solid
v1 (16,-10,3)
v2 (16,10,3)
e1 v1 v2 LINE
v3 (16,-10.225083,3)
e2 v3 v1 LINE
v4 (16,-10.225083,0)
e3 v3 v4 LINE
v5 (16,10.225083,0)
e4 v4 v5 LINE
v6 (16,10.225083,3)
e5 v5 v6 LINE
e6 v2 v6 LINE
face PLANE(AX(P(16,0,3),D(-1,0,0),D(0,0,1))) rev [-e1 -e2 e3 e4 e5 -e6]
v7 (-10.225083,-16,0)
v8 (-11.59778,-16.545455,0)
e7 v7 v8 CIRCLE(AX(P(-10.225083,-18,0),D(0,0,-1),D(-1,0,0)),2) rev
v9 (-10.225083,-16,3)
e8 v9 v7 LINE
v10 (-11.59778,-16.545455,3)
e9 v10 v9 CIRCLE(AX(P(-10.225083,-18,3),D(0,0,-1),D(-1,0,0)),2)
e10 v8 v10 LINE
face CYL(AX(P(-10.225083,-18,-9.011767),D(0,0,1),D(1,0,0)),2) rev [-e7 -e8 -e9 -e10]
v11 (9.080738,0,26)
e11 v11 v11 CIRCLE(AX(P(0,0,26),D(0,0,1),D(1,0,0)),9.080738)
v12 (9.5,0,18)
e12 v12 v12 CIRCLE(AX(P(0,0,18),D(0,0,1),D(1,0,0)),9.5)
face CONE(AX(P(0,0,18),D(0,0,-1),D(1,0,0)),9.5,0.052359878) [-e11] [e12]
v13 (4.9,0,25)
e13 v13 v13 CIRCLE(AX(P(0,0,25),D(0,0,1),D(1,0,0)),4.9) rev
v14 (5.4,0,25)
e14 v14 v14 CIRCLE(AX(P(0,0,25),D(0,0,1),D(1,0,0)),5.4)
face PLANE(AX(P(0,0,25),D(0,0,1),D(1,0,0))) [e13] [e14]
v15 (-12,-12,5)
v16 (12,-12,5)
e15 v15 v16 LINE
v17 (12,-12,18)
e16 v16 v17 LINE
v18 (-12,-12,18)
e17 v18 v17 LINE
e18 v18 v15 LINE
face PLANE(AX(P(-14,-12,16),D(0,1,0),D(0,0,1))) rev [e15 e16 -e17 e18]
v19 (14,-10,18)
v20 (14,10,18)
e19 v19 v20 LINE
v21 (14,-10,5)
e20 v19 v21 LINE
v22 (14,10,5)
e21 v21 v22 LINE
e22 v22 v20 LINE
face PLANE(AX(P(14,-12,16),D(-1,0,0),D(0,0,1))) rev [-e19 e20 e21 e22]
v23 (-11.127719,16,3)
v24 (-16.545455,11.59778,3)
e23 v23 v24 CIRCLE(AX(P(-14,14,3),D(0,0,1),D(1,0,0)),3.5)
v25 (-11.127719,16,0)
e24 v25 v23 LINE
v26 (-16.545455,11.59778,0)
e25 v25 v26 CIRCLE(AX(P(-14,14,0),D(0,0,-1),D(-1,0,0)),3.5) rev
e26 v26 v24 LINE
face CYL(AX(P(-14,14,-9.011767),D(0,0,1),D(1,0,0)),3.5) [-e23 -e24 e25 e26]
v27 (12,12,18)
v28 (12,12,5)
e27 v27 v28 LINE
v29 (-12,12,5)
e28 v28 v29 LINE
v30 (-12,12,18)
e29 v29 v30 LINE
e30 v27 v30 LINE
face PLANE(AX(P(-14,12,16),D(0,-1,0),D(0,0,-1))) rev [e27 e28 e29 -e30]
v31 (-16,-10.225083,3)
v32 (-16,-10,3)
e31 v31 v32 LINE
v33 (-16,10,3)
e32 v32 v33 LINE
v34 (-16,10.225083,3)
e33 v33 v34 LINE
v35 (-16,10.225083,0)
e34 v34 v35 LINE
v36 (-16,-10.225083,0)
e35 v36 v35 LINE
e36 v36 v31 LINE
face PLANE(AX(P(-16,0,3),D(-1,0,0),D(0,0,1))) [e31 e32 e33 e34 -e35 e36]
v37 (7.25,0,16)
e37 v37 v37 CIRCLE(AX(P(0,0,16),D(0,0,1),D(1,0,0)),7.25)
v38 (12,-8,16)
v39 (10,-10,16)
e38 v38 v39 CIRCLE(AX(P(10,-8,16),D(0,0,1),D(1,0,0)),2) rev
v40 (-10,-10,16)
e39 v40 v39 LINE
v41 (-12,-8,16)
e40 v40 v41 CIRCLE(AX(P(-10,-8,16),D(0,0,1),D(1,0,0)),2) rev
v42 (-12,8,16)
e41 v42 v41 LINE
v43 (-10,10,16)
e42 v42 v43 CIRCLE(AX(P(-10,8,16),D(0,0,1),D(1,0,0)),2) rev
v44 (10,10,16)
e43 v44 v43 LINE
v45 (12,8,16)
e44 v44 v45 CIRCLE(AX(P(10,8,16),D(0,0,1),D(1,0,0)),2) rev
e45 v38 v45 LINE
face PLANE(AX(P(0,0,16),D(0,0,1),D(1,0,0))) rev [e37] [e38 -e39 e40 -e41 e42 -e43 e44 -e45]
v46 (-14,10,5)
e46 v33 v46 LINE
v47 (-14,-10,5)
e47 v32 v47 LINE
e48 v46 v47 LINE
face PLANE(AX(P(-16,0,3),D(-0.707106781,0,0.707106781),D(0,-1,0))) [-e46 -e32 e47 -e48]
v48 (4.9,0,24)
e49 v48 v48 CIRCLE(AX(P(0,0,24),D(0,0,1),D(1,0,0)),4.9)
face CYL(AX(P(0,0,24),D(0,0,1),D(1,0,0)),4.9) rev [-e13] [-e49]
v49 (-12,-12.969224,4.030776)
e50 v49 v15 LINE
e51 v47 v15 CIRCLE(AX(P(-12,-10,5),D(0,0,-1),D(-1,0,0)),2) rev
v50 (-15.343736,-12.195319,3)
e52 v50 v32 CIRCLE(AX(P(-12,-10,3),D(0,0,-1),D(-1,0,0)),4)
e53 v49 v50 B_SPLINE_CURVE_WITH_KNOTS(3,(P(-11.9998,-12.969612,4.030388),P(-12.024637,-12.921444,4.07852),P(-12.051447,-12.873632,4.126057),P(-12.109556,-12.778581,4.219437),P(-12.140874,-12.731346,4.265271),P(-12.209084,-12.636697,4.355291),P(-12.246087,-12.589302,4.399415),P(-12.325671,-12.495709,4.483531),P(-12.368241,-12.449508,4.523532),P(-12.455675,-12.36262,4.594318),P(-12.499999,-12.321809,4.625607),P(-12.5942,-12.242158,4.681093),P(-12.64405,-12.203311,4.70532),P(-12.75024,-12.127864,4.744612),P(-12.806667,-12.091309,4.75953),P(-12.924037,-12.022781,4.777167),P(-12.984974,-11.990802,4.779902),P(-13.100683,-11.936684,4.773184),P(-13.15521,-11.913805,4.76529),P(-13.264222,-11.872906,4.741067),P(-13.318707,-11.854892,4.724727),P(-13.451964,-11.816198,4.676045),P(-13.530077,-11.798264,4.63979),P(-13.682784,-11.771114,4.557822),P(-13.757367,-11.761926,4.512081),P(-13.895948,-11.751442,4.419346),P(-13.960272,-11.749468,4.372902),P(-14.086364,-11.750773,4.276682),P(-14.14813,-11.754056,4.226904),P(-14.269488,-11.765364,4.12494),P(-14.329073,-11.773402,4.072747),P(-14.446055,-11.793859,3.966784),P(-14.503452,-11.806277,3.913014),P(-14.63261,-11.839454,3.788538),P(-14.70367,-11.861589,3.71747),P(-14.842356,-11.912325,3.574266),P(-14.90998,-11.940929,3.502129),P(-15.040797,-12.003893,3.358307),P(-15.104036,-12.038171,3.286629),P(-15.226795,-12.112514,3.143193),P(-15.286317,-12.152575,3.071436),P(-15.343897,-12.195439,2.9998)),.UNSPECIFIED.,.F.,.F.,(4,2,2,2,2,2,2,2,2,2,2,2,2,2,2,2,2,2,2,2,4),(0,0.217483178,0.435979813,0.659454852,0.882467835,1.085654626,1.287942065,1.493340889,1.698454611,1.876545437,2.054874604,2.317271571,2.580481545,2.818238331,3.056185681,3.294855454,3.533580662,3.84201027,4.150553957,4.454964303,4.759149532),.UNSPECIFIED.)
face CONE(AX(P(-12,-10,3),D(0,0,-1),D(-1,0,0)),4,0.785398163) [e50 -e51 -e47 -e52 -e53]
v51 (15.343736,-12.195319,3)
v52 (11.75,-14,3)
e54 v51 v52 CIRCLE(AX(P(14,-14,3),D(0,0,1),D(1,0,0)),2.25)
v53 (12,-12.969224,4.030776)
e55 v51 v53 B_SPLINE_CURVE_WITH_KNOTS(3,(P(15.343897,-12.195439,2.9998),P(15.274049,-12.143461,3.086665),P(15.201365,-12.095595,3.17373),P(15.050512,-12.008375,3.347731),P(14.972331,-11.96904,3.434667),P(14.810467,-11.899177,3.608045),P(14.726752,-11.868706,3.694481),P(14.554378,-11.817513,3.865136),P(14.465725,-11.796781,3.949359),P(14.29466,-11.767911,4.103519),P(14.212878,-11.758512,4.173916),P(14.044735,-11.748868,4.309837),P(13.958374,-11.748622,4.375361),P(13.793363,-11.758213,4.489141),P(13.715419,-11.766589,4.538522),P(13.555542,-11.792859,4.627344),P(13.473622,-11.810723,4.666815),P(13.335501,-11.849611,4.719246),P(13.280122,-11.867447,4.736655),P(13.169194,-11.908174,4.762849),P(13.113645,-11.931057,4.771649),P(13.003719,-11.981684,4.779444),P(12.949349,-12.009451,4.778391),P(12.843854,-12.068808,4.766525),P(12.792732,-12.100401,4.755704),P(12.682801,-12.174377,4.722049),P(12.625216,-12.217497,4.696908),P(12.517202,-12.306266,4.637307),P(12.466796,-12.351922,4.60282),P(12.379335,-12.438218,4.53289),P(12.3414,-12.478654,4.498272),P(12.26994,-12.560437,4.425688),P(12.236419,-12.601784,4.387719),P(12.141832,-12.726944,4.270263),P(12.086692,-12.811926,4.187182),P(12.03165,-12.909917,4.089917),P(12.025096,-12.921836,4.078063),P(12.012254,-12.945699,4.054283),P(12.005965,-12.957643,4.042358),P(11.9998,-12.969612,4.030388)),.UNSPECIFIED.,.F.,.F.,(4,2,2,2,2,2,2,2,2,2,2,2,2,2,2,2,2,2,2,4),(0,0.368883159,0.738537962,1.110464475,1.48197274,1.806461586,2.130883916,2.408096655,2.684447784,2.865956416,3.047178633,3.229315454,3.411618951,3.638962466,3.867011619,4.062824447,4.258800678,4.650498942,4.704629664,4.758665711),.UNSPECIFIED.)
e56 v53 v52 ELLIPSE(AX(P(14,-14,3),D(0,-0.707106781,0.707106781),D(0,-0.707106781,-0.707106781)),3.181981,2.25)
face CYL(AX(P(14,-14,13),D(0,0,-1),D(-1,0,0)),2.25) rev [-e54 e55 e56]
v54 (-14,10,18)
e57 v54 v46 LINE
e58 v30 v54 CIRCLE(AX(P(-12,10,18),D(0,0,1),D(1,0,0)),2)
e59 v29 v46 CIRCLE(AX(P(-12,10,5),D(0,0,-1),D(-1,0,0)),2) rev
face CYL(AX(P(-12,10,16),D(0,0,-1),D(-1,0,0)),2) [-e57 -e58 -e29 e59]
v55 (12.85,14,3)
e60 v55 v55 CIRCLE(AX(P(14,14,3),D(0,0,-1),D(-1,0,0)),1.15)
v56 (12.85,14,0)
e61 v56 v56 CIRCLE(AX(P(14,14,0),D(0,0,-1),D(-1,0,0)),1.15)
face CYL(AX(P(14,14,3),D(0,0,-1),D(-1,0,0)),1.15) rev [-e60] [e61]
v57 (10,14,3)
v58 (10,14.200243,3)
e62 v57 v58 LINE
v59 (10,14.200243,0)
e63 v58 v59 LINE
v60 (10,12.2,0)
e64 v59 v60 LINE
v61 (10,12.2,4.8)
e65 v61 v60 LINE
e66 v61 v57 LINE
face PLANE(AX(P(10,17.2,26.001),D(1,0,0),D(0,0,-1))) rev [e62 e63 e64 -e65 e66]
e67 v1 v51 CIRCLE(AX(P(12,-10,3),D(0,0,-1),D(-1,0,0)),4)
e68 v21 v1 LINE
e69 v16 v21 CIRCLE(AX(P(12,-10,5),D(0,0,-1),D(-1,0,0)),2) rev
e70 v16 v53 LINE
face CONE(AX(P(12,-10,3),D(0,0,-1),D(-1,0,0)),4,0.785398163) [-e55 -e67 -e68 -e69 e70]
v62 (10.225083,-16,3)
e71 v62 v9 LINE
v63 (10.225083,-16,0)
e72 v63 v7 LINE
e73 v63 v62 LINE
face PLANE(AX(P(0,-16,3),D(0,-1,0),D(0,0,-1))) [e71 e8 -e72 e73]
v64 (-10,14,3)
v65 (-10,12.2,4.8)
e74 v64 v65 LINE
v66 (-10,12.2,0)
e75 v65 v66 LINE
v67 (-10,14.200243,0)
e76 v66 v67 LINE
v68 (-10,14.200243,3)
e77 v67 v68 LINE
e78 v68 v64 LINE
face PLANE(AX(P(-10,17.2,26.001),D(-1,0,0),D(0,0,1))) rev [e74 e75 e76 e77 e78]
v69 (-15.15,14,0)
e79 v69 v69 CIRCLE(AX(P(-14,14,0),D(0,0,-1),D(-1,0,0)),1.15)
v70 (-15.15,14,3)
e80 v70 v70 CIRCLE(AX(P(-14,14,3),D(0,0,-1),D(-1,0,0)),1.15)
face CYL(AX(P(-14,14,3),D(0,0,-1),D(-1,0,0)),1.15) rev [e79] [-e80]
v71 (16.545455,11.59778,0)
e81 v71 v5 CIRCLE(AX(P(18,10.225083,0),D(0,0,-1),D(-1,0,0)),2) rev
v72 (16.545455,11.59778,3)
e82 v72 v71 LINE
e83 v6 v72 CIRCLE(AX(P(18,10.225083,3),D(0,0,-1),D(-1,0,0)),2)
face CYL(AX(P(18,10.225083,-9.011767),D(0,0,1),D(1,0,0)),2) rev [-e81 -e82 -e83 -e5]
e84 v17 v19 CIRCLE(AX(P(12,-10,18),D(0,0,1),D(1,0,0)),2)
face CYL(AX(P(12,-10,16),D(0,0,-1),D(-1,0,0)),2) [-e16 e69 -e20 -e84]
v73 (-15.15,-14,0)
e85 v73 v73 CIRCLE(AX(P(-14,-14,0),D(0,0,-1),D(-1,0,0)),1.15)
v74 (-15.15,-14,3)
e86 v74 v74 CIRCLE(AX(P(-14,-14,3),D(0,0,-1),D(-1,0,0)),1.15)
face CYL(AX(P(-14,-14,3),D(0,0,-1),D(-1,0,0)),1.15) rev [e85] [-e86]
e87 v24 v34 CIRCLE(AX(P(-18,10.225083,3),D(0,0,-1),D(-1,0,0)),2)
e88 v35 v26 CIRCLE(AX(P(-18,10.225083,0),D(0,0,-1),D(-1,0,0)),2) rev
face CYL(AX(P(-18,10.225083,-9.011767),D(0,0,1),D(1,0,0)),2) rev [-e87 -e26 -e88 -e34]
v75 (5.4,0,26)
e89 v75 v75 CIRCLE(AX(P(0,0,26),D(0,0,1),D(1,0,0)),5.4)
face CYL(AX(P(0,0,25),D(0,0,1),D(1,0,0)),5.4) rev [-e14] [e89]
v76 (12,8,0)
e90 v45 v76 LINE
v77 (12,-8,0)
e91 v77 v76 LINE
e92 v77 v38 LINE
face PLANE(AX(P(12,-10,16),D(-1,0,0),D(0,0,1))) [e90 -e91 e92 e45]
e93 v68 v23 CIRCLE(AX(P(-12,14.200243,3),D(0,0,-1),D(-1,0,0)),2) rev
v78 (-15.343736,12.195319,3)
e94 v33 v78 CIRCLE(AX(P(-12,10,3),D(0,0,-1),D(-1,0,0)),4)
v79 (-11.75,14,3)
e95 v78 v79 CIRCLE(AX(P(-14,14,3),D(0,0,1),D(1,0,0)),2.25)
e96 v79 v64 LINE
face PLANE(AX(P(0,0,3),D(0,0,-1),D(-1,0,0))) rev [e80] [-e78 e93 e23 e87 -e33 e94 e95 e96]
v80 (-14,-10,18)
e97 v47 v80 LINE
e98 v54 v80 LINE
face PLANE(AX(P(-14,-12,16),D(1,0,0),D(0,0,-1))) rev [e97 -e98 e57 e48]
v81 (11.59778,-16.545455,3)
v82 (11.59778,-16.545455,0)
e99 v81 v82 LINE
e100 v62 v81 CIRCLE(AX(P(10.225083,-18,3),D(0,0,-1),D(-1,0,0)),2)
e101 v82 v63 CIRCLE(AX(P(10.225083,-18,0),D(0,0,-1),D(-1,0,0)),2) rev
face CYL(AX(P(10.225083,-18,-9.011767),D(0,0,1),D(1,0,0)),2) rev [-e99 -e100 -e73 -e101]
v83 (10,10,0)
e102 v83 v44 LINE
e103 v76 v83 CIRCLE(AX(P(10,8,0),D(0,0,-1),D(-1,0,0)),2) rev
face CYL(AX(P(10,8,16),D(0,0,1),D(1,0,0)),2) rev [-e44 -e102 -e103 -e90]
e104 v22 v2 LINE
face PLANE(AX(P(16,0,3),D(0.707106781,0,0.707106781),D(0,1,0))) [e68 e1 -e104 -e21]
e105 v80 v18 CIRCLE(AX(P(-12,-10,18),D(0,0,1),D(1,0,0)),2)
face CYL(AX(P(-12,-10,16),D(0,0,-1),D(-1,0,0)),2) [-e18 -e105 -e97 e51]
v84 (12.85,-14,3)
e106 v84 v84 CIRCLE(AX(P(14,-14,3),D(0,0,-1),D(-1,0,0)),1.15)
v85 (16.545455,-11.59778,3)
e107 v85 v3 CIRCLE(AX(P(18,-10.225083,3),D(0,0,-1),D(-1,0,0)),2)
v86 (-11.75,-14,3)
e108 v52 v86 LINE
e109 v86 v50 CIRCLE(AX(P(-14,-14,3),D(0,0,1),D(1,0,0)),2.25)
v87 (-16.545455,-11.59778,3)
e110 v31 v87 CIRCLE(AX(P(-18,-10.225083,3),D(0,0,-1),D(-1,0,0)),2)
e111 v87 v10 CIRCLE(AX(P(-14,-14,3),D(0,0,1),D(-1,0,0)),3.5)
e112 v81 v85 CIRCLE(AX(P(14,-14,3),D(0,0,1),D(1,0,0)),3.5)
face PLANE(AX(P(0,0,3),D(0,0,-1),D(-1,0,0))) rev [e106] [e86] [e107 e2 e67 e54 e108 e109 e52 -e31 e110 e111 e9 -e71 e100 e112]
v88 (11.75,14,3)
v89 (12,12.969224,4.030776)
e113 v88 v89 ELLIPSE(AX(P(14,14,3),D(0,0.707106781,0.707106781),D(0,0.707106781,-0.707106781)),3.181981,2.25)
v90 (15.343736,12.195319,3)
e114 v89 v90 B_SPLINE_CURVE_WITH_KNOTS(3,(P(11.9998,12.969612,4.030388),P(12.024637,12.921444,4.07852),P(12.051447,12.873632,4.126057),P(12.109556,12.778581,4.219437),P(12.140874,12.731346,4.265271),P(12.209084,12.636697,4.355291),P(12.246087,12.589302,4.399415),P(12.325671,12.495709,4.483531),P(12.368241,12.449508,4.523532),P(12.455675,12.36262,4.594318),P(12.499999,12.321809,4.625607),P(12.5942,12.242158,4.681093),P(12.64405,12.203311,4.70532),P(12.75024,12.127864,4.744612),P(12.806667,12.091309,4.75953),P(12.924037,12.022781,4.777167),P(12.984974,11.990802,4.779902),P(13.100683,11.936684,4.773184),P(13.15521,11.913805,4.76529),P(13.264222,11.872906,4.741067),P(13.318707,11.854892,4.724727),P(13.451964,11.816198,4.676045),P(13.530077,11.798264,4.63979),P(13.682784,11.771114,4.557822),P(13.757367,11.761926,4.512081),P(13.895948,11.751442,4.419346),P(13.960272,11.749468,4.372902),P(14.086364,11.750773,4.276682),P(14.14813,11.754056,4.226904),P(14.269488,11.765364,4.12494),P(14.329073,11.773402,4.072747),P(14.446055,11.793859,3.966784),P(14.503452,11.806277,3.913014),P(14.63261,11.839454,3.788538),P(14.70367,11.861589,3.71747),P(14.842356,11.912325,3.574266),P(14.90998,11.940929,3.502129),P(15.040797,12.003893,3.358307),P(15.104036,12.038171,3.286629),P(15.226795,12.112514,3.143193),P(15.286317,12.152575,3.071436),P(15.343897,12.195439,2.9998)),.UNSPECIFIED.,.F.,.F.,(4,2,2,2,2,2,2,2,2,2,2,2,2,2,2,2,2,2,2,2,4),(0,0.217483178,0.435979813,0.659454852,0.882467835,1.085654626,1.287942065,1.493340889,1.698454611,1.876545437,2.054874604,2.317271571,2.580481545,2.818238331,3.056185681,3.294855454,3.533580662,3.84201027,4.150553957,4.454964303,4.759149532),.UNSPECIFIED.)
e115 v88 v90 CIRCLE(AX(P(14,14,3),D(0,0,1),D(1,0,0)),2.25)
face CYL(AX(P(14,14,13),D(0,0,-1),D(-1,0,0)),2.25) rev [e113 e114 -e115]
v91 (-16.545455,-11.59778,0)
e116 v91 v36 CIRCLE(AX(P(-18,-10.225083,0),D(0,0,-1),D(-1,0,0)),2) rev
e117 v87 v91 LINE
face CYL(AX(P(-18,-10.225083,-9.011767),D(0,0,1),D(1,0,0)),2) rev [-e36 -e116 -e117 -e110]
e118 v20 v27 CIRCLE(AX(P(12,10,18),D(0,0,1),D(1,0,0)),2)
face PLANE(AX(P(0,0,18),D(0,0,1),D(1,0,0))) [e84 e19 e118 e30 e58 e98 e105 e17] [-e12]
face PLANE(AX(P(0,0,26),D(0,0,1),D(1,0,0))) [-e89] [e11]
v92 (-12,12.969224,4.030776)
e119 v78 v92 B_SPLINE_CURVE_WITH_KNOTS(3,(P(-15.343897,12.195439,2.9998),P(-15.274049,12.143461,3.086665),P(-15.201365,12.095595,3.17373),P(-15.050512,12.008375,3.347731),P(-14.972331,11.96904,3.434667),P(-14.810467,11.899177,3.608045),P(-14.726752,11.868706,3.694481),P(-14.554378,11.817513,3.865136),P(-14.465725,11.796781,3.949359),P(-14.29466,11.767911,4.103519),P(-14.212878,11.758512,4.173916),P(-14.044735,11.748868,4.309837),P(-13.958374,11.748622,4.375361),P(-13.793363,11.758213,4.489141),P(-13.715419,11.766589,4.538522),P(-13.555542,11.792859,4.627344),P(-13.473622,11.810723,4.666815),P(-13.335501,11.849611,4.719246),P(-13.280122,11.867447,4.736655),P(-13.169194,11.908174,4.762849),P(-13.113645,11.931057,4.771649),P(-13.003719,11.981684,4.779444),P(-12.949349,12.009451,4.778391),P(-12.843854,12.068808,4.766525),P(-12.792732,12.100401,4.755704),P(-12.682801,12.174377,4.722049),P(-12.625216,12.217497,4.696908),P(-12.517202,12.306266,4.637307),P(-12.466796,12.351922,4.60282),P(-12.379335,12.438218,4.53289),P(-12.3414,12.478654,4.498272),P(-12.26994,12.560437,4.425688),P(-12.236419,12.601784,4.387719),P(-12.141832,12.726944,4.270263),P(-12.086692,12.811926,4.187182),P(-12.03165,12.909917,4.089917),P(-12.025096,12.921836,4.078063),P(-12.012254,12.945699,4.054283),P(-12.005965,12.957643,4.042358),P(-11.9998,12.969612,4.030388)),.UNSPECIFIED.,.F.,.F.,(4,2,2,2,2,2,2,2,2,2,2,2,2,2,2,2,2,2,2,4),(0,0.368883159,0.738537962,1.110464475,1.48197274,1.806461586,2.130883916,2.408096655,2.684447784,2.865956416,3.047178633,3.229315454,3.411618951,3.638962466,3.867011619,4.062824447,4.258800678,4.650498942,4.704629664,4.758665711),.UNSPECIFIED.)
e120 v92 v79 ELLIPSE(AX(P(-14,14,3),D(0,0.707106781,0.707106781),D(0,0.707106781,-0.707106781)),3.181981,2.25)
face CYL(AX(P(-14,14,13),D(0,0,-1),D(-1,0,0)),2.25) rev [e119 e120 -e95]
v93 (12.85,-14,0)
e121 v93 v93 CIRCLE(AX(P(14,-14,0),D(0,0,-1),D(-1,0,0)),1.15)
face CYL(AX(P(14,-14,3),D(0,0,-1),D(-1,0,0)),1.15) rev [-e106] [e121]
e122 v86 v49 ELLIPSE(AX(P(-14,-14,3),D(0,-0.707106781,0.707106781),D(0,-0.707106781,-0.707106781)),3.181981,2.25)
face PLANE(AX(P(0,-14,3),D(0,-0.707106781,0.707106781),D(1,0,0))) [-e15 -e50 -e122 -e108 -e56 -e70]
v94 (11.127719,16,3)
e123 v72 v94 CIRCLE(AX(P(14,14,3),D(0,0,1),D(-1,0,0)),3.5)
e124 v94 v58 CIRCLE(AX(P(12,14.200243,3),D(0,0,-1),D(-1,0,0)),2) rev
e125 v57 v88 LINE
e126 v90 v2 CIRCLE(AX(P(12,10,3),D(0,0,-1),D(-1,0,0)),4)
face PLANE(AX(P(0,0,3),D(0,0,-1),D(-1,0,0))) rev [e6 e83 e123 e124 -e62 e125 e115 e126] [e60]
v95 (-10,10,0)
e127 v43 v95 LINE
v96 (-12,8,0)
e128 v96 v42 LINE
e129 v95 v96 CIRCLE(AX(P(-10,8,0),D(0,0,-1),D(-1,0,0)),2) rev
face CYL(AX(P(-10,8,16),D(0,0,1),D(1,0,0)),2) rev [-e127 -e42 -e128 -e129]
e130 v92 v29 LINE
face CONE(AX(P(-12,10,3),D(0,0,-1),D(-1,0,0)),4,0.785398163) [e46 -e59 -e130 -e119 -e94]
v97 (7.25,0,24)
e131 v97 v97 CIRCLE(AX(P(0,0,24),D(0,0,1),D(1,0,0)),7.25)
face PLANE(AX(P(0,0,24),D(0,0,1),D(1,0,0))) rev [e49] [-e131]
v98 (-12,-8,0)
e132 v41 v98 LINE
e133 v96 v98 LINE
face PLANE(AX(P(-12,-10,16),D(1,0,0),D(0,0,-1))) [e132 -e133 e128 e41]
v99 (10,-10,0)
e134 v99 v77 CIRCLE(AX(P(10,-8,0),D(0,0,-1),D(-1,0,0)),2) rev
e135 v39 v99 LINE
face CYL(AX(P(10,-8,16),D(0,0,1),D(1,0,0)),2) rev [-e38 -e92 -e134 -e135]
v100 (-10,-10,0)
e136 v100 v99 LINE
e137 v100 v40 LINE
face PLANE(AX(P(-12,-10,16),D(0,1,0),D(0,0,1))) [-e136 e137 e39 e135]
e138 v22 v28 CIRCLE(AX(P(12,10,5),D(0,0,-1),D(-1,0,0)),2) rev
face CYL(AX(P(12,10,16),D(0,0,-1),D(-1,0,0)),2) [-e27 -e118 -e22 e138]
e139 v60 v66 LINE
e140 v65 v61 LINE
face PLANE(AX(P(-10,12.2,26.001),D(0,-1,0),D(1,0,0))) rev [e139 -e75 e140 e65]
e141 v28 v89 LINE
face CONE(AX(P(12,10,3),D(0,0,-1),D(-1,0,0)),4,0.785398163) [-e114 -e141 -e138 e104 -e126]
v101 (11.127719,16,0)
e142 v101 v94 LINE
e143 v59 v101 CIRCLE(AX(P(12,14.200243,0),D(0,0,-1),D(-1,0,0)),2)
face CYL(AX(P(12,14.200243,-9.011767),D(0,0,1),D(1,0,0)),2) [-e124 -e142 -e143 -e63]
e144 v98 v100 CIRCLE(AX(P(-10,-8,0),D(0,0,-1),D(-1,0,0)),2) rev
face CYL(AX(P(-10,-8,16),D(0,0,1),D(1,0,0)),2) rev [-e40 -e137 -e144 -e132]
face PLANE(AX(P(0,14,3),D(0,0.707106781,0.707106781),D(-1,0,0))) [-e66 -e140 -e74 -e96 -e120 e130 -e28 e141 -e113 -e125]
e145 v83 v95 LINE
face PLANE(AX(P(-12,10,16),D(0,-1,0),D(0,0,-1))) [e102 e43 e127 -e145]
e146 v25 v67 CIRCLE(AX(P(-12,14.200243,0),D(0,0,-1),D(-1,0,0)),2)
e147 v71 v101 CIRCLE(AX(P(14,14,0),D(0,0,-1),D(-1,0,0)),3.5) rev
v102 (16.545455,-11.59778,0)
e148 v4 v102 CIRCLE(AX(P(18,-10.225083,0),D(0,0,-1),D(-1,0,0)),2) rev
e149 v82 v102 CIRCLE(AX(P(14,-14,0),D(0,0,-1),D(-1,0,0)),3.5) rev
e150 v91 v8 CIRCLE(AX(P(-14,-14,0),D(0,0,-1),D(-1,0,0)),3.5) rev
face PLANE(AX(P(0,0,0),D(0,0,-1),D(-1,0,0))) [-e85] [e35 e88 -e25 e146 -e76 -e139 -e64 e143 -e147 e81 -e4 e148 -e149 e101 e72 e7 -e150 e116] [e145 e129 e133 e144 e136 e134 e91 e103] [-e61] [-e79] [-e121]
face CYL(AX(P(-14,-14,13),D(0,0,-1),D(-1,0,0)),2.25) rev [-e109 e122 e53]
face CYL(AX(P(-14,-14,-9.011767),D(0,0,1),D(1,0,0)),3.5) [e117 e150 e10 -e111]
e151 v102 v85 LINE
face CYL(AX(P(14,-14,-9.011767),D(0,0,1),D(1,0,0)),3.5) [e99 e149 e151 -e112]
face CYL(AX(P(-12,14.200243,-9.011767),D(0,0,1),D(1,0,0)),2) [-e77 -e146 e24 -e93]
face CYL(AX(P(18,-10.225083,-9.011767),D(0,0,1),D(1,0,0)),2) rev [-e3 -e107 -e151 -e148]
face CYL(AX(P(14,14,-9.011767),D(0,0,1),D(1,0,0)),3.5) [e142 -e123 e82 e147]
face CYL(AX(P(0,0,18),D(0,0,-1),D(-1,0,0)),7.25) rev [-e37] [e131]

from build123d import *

# Parameters (mm, degrees)
SKETCH_1_W          = 28
SKETCH_1_H          = 24
SKETCH_1_W_2        = 24
SKETCH_1_H_2        = 20
EXTRUDE_1_DEPTH     = 16
SKETCH_2_W          = 32
SKETCH_2_H          = 32
SKETCH_2_R          = 1.15
SKETCH_2_W_2        = 28
SKETCH_2_H_2        = 24
EXTRUDE_2_DEPTH     = 3
SKETCH_3_W          = 28
SKETCH_3_H          = 24
SKETCH_3_R          = 7.25
EXTRUDE_3_DEPTH     = 2
SKETCH_4_R          = 9.5
EXTRUDE_4_DEPTH     = 8
EXTRUDE_4_TAPER     = 3
SKETCH_6_R          = 7.25
CUT_EXTRUDE_2_DEPTH = 29.91366459
EXTRUDE_START       = -2
SKETCH_5_R          = 7.25
SKETCH_5_R_2        = 4.9
EXTRUDE_5_DEPTH     = 2
SKETCH_9_R          = 5.4
CUT_EXTRUDE_5_DEPTH = 1
FILLET_1_R          = 2
CUT_EXTRUDE_3_REACH = 36.467
SKETCH_7_W          = 20
SKETCH_7_H          = 5
CHAMFER_1_SIZE      = 2
SKETCH_8_R          = 2.25
CUT_EXTRUDE_4_DEPTH = 10
EXTRUDE_6_DEPTH     = 3
FILLET_2_R          = 2


with BuildPart() as part:
    # 草图1 → 凸台-拉伸1 (new body)
    with BuildSketch(Plane.XY):
        Rectangle(SKETCH_1_W, SKETCH_1_H)
        Rectangle(SKETCH_1_W_2, SKETCH_1_H_2, mode=Mode.SUBTRACT)
    extrude(amount=EXTRUDE_1_DEPTH)

    # 草图2 → 凸台-拉伸2 (add)
    with BuildSketch(Plane(origin=(0, 0, 0), x_dir=(-1, 0, 0), z_dir=(0, 0, -1))):
        Rectangle(SKETCH_2_W, SKETCH_2_H)
        with Locations((14, 14)):
            Circle(SKETCH_2_R, mode=Mode.SUBTRACT)
        with Locations((14, -14)):
            Circle(SKETCH_2_R, mode=Mode.SUBTRACT)
        with Locations((-14, -14)):
            Circle(SKETCH_2_R, mode=Mode.SUBTRACT)
        with Locations((-14, 14)):
            Circle(SKETCH_2_R, mode=Mode.SUBTRACT)
        Rectangle(SKETCH_2_W_2, SKETCH_2_H_2, mode=Mode.SUBTRACT)
    extrude(amount=-EXTRUDE_2_DEPTH)

    # 草图3 → 凸台-拉伸3 (add)
    with BuildSketch(Plane.XY.offset(16)):
        Rectangle(SKETCH_3_W, SKETCH_3_H)
        Circle(SKETCH_3_R, mode=Mode.SUBTRACT)
    extrude(amount=EXTRUDE_3_DEPTH)

    # 草图4 → 凸台-拉伸4 (add)
    with BuildSketch(Plane.XY.offset(18)):
        Circle(SKETCH_4_R)
    extrude(amount=EXTRUDE_4_DEPTH, taper=EXTRUDE_4_TAPER)

    # 草图6 → 切除-拉伸2 (cut, through all)
    with BuildSketch(Plane(origin=(0, 0, 18), x_dir=(-1, 0, 0), z_dir=(0, 0, -1))):
        Circle(SKETCH_6_R)
    extrude(amount=-CUT_EXTRUDE_2_DEPTH, mode=Mode.SUBTRACT)

    # 草图5 → 凸台-拉伸5 (add)
    with BuildSketch(Plane.XY.offset(26).offset(EXTRUDE_START)):
        Circle(SKETCH_5_R)
        Circle(SKETCH_5_R_2, mode=Mode.SUBTRACT)
    extrude(amount=EXTRUDE_5_DEPTH)

    # 草图9 → 切除-拉伸5 (cut)
    with BuildSketch(Plane.XY.offset(26)):
        Circle(SKETCH_9_R)
    extrude(amount=-CUT_EXTRUDE_5_DEPTH, mode=Mode.SUBTRACT)

    # 圆角1
    fillet_1_edges = [part.edges().sort_by_distance(p)[0] for p in [
        (12, -10, 8),
        (12, 10, 8),
        (-12, 10, 8),
        (-12, -10, 8),
        (14, -12, 10.5),
        (-14, -12, 10.5),
        (-14, 12, 10.5),
        (14, 12, 10.5),
    ]]
    fillet(fillet_1_edges, radius=FILLET_1_R)

    # 草图7 → 切除-拉伸3 (cut, up to next)
    with BuildSketch(Plane(origin=(0, 0, 0), x_dir=(-1, 0, 0), z_dir=(0, 0, -1)), mode=Mode.PRIVATE) as cut_extrude_3_sk1:
        with Locations((0, 14.7)):
            Rectangle(SKETCH_7_W, SKETCH_7_H)
    cut_extrude_3_tool1 = extrude(cut_extrude_3_sk1.sketch, amount=-CUT_EXTRUDE_3_REACH, mode=Mode.PRIVATE) & part.part
    add(cut_extrude_3_tool1.solids().sort_by_distance((0, 14.7, 0))[0], mode=Mode.SUBTRACT)

    # 倒角1
    # the kernel refuses this chamfer: 2 mm, written as the material it adds along each edge
    with BuildSketch(Plane(origin=(-12, 12, 3), x_dir=(0, 1, 0), z_dir=(1, 0, 0))) as chamfer_1_piece_1_section:
        Polygon((CHAMFER_1_SIZE, 0), (0, CHAMFER_1_SIZE), (0, 0), align=None)
    chamfer_1_piece_1 = extrude(amount=24, mode=Mode.PRIVATE)
    chamfer_1_piece_1 = split(chamfer_1_piece_1, bisect_by=Plane(origin=(-12, 12.2, 3), z_dir=(0, 1, 0)), keep=Keep.TOP, mode=Mode.PRIVATE)
    chamfer_1_piece_1 = split(chamfer_1_piece_1, bisect_by=Plane(origin=(-10, 12, 3), z_dir=(-1, 0, 0)), keep=Keep.TOP, mode=Mode.PRIVATE)
    add(chamfer_1_piece_1)
    with BuildSketch(Plane(origin=(-12, 12, 3), x_dir=(0, 1, 0), z_dir=(1, 0, 0))) as chamfer_1_piece_2_section:
        Polygon((CHAMFER_1_SIZE, 0), (0, CHAMFER_1_SIZE), (0, 0), align=None)
    chamfer_1_piece_2 = extrude(amount=24, mode=Mode.PRIVATE)
    chamfer_1_piece_2 = split(chamfer_1_piece_2, bisect_by=Plane(origin=(-12, 12.2, 3), z_dir=(0, -1, 0)), keep=Keep.TOP, mode=Mode.PRIVATE)
    chamfer_1_piece_2 = split(chamfer_1_piece_2, bisect_by=Plane(origin=(-10, 12, 3), z_dir=(-1, 0, 0)), keep=Keep.TOP, mode=Mode.PRIVATE)
    add(chamfer_1_piece_2)
    with BuildSketch(Plane(origin=(-12, 12, 3), x_dir=(0, 1, 0), z_dir=(1, 0, 0))) as chamfer_1_piece_3_section:
        Polygon((CHAMFER_1_SIZE, 0), (0, CHAMFER_1_SIZE), (0, 0), align=None)
    chamfer_1_piece_3 = extrude(amount=24, mode=Mode.PRIVATE)
    chamfer_1_piece_3 = split(chamfer_1_piece_3, bisect_by=Plane(origin=(10, 12, 3), z_dir=(-1, 0, 0)), keep=Keep.TOP, mode=Mode.PRIVATE)
    chamfer_1_piece_3 = split(chamfer_1_piece_3, bisect_by=Plane(origin=(-12, 12.2, 3), z_dir=(0, -1, 0)), keep=Keep.TOP, mode=Mode.PRIVATE)
    chamfer_1_piece_3 = split(chamfer_1_piece_3, bisect_by=Plane(origin=(-10, 12, 3), z_dir=(1, 0, 0)), keep=Keep.TOP, mode=Mode.PRIVATE)
    add(chamfer_1_piece_3)
    with BuildSketch(Plane(origin=(-12, 12, 3), x_dir=(0, 1, 0), z_dir=(1, 0, 0))) as chamfer_1_piece_4_section:
        Polygon((CHAMFER_1_SIZE, 0), (0, CHAMFER_1_SIZE), (0, 0), align=None)
    chamfer_1_piece_4 = extrude(amount=24, mode=Mode.PRIVATE)
    chamfer_1_piece_4 = split(chamfer_1_piece_4, bisect_by=Plane(origin=(10, 12, 3), z_dir=(1, 0, 0)), keep=Keep.TOP, mode=Mode.PRIVATE)
    chamfer_1_piece_4 = split(chamfer_1_piece_4, bisect_by=Plane(origin=(-12, 12.2, 3), z_dir=(0, 1, 0)), keep=Keep.TOP, mode=Mode.PRIVATE)
    add(chamfer_1_piece_4)
    with BuildSketch(Plane(origin=(-12, 12, 3), x_dir=(0, 1, 0), z_dir=(1, 0, 0))) as chamfer_1_piece_5_section:
        Polygon((CHAMFER_1_SIZE, 0), (0, CHAMFER_1_SIZE), (0, 0), align=None)
    chamfer_1_piece_5 = extrude(amount=24, mode=Mode.PRIVATE)
    chamfer_1_piece_5 = split(chamfer_1_piece_5, bisect_by=Plane(origin=(10, 12, 3), z_dir=(1, 0, 0)), keep=Keep.TOP, mode=Mode.PRIVATE)
    chamfer_1_piece_5 = split(chamfer_1_piece_5, bisect_by=Plane(origin=(-12, 12.2, 3), z_dir=(0, -1, 0)), keep=Keep.TOP, mode=Mode.PRIVATE)
    add(chamfer_1_piece_5)
    with BuildSketch(Plane(origin=(12, 10, 3), x_dir=(1, 0, 0), z_dir=(0, -1, 0))) as chamfer_1_piece_6_section:
        Polygon((2 + CHAMFER_1_SIZE, 0), (2, CHAMFER_1_SIZE), (2, 0), align=None)
    chamfer_1_piece_6 = revolve(axis=Axis((12, 10, 3), (0, 0, 1)), revolution_arc=90, mode=Mode.PRIVATE)
    chamfer_1_piece_6 = split(chamfer_1_piece_6, bisect_by=Plane(origin=(16, 10, 3), z_dir=(-1, 0, 0)), keep=Keep.TOP, mode=Mode.PRIVATE)
    chamfer_1_piece_6 = chamfer_1_piece_6 - Plane(origin=(14, 14, 3), x_dir=(-1, 0, 0), z_dir=(0, 0, -1)) * Cylinder(1.15, 16, mode=Mode.PRIVATE)
    add(chamfer_1_piece_6)
    with BuildSketch(Plane(origin=(-12, 10, 3), x_dir=(-1, 0, 0), z_dir=(0, -1, 0))) as chamfer_1_piece_7_section:
        Polygon((2 + CHAMFER_1_SIZE, 0), (2, -CHAMFER_1_SIZE), (2, 0), align=None)
    chamfer_1_piece_7 = revolve(axis=Axis((-12, 10, 3), (0, 0, -1)), revolution_arc=90, mode=Mode.PRIVATE)
    chamfer_1_piece_7 = split(chamfer_1_piece_7, bisect_by=Plane(origin=(-16, 10, 3), z_dir=(1, 0, 0)), keep=Keep.TOP, mode=Mode.PRIVATE)
    chamfer_1_piece_7 = chamfer_1_piece_7 - Plane(origin=(-14, 14, 3), x_dir=(-1, 0, 0), z_dir=(0, 0, -1)) * Cylinder(1.15, 17, mode=Mode.PRIVATE)
    add(chamfer_1_piece_7)
    with BuildSketch(Plane(origin=(14, 10, 3), x_dir=(1, 0, 0), z_dir=(0, -1, 0))) as chamfer_1_piece_8_section:
        Polygon((CHAMFER_1_SIZE, 0), (0, CHAMFER_1_SIZE), (0, 0), align=None)
    chamfer_1_piece_8 = extrude(amount=20, mode=Mode.PRIVATE)
    chamfer_1_piece_8 = split(chamfer_1_piece_8, bisect_by=Plane(origin=(16, 10, 3), z_dir=(-1, 0, 0)), keep=Keep.TOP, mode=Mode.PRIVATE)
    add(chamfer_1_piece_8)
    with BuildSketch(Plane(origin=(-14, -10, 3), x_dir=(-1, 0, 0), z_dir=(0, 1, 0))) as chamfer_1_piece_9_section:
        Polygon((CHAMFER_1_SIZE, 0), (0, CHAMFER_1_SIZE), (0, 0), align=None)
    chamfer_1_piece_9 = extrude(amount=20, mode=Mode.PRIVATE)
    chamfer_1_piece_9 = split(chamfer_1_piece_9, bisect_by=Plane(origin=(-16, -10, 3), z_dir=(1, 0, 0)), keep=Keep.TOP, mode=Mode.PRIVATE)
    add(chamfer_1_piece_9)
    with BuildSketch(Plane(origin=(12, -10, 3), x_dir=(0, -1, 0), z_dir=(-1, 0, 0))) as chamfer_1_piece_10_section:
        Polygon((2 + CHAMFER_1_SIZE, 0), (2, CHAMFER_1_SIZE), (2, 0), align=None)
    chamfer_1_piece_10 = revolve(axis=Axis((12, -10, 3), (0, 0, 1)), revolution_arc=90, mode=Mode.PRIVATE)
    chamfer_1_piece_10 = split(chamfer_1_piece_10, bisect_by=Plane(origin=(16, -10, 3), z_dir=(-1, 0, 0)), keep=Keep.TOP, mode=Mode.PRIVATE)
    chamfer_1_piece_10 = chamfer_1_piece_10 - Plane(origin=(14, -14, 3), x_dir=(-1, 0, 0), z_dir=(0, 0, -1)) * Cylinder(1.15, 16, mode=Mode.PRIVATE)
    add(chamfer_1_piece_10)
    with BuildSketch(Plane(origin=(-12, -10, 3), x_dir=(0, -1, 0), z_dir=(1, 0, 0))) as chamfer_1_piece_11_section:
        Polygon((2 + CHAMFER_1_SIZE, 0), (2, -CHAMFER_1_SIZE), (2, 0), align=None)
    chamfer_1_piece_11 = revolve(axis=Axis((-12, -10, 3), (0, 0, -1)), revolution_arc=90, mode=Mode.PRIVATE)
    chamfer_1_piece_11 = split(chamfer_1_piece_11, bisect_by=Plane(origin=(-16, -10, 3), z_dir=(1, 0, 0)), keep=Keep.TOP, mode=Mode.PRIVATE)
    chamfer_1_piece_11 = chamfer_1_piece_11 - Plane(origin=(-14, -14, 3), x_dir=(-1, 0, 0), z_dir=(0, 0, -1)) * Cylinder(1.15, 17, mode=Mode.PRIVATE)
    add(chamfer_1_piece_11)
    with BuildSketch(Plane(origin=(12, -12, 3), x_dir=(0, 0, 1), z_dir=(-1, 0, 0))) as chamfer_1_piece_12:
        Polygon((CHAMFER_1_SIZE, 0), (0, -CHAMFER_1_SIZE), (0, 0), align=None)
    extrude(amount=24)

    # 草图8 → 切除-拉伸4 (cut)
    with BuildSketch(Plane.XY.offset(3)):
        with Locations((-14, -14)):
            Circle(SKETCH_8_R)
        with Locations((14, -14)):
            Circle(SKETCH_8_R)
        with Locations((14, 14)):
            Circle(SKETCH_8_R)
        with Locations((-14, 14)):
            Circle(SKETCH_8_R)
    extrude(amount=CUT_EXTRUDE_4_DEPTH, mode=Mode.SUBTRACT)

    # 草图10 → 凸台-拉伸6 (add)
    with BuildSketch(Plane.XY.offset(3)):
        with BuildLine():
            Line((16, -16), (16, -11.127718677))
            ThreePointArc((16, -11.127718677), (16.474873734, -16.474873734), (11.127718677, -16))
            Line((11.127718677, -16), (16, -16))
        make_face()
        with BuildLine():
            Line((-16, -16), (-11.127718677, -16))
            ThreePointArc((-11.127718677, -16), (-16.474873734, -16.474873734), (-16, -11.127718677))
            Line((-16, -11.127718677), (-16, -16))
        make_face()
        with BuildLine():
            Line((-16, 16), (-11.127718677, 16))
            ThreePointArc((-11.127718677, 16), (-16.474873734, 16.474873734), (-16, 11.127718677))
            Line((-16, 11.127718677), (-16, 16))
        make_face()
        with BuildLine():
            Line((16, 16), (11.127718677, 16))
            ThreePointArc((11.127718677, 16), (16.474873734, 16.474873734), (16, 11.127718677))
            Line((16, 11.127718677), (16, 16))
        make_face()
    extrude(amount=-EXTRUDE_6_DEPTH)

    # 圆角2
    # the kernel refuses this fillet: 2 mm, written as the material it adds along each edge
    with BuildSketch(Plane(origin=(16, -11.127718677, 3), x_dir=(0, 1, 0), z_dir=(0, 0, -1)), Plane(origin=(-11.127718677, -16, 3), x_dir=(1, 0, 0), z_dir=(0, 0, -1)), Plane(origin=(-16, 11.127718677, 3), x_dir=(0, -1, 0), z_dir=(0, 0, -1))) as fillet_2_piece_1:
        with BuildLine():
            CenterArc((0.902635894, 2), FILLET_2_R, 226.658241773, 43.341758227)
            ThreePointArc((-0.470061276, 0.545454545), (-0.220966302, 0.284847622), (0, 0))
            Line((0, 0), (0.902635894, 0))
        make_face()
    extrude(amount=3)
    with BuildSketch(Plane(origin=(11.127718677, -16, 3), x_dir=(-1, 0, 0), z_dir=(0, 0, -1)), Plane(origin=(-16, -11.127718677, 3), x_dir=(0, 1, 0), z_dir=(0, 0, -1)), Plane(origin=(16, 11.127718677, 3), x_dir=(0, -1, 0), z_dir=(0, 0, -1))) as fillet_2_piece_2:
        with BuildLine():
            CenterArc((0.902635894, -2), FILLET_2_R, 90, 43.341758227)
            ThreePointArc((-0.470061276, -0.545454545), (-0.220966302, -0.284847622), (0, 0))
            Line((0, 0), (0.902635894, 0))
        make_face()
    extrude(amount=3)
    # the kernel refuses this fillet: 2 mm, written as the material it takes off along each edge
    with BuildSketch(Plane(origin=(-10, 16, 7.499392524), x_dir=(-1, 0, 0), z_dir=(0, 0, -1))) as fillet_2_2_piece_1:
        with BuildLine():
            CenterArc((2, -1.799757009), FILLET_2_R, 115.857898182, 64.142101818)
            Line((0, -1.799757009), (0, 0))
            Line((0, 0), (1.127718677, 0))
        make_face()
    extrude(amount=11.998785047, mode=Mode.SUBTRACT)
    with BuildSketch(Plane(origin=(10, 16, -4.499392524), x_dir=(0, -1, 0), z_dir=(0, 0, 1))) as fillet_2_2_piece_2:
        with BuildLine():
            CenterArc((1.799757009, 2), FILLET_2_R, 205.857898182, 64.142101818)
            Line((0, 1.127718677), (0, 0))
            Line((0, 0), (1.799757009, 0))
        make_face()
    extrude(amount=11.998785047, mode=Mode.SUBTRACT)


solid = part.part
